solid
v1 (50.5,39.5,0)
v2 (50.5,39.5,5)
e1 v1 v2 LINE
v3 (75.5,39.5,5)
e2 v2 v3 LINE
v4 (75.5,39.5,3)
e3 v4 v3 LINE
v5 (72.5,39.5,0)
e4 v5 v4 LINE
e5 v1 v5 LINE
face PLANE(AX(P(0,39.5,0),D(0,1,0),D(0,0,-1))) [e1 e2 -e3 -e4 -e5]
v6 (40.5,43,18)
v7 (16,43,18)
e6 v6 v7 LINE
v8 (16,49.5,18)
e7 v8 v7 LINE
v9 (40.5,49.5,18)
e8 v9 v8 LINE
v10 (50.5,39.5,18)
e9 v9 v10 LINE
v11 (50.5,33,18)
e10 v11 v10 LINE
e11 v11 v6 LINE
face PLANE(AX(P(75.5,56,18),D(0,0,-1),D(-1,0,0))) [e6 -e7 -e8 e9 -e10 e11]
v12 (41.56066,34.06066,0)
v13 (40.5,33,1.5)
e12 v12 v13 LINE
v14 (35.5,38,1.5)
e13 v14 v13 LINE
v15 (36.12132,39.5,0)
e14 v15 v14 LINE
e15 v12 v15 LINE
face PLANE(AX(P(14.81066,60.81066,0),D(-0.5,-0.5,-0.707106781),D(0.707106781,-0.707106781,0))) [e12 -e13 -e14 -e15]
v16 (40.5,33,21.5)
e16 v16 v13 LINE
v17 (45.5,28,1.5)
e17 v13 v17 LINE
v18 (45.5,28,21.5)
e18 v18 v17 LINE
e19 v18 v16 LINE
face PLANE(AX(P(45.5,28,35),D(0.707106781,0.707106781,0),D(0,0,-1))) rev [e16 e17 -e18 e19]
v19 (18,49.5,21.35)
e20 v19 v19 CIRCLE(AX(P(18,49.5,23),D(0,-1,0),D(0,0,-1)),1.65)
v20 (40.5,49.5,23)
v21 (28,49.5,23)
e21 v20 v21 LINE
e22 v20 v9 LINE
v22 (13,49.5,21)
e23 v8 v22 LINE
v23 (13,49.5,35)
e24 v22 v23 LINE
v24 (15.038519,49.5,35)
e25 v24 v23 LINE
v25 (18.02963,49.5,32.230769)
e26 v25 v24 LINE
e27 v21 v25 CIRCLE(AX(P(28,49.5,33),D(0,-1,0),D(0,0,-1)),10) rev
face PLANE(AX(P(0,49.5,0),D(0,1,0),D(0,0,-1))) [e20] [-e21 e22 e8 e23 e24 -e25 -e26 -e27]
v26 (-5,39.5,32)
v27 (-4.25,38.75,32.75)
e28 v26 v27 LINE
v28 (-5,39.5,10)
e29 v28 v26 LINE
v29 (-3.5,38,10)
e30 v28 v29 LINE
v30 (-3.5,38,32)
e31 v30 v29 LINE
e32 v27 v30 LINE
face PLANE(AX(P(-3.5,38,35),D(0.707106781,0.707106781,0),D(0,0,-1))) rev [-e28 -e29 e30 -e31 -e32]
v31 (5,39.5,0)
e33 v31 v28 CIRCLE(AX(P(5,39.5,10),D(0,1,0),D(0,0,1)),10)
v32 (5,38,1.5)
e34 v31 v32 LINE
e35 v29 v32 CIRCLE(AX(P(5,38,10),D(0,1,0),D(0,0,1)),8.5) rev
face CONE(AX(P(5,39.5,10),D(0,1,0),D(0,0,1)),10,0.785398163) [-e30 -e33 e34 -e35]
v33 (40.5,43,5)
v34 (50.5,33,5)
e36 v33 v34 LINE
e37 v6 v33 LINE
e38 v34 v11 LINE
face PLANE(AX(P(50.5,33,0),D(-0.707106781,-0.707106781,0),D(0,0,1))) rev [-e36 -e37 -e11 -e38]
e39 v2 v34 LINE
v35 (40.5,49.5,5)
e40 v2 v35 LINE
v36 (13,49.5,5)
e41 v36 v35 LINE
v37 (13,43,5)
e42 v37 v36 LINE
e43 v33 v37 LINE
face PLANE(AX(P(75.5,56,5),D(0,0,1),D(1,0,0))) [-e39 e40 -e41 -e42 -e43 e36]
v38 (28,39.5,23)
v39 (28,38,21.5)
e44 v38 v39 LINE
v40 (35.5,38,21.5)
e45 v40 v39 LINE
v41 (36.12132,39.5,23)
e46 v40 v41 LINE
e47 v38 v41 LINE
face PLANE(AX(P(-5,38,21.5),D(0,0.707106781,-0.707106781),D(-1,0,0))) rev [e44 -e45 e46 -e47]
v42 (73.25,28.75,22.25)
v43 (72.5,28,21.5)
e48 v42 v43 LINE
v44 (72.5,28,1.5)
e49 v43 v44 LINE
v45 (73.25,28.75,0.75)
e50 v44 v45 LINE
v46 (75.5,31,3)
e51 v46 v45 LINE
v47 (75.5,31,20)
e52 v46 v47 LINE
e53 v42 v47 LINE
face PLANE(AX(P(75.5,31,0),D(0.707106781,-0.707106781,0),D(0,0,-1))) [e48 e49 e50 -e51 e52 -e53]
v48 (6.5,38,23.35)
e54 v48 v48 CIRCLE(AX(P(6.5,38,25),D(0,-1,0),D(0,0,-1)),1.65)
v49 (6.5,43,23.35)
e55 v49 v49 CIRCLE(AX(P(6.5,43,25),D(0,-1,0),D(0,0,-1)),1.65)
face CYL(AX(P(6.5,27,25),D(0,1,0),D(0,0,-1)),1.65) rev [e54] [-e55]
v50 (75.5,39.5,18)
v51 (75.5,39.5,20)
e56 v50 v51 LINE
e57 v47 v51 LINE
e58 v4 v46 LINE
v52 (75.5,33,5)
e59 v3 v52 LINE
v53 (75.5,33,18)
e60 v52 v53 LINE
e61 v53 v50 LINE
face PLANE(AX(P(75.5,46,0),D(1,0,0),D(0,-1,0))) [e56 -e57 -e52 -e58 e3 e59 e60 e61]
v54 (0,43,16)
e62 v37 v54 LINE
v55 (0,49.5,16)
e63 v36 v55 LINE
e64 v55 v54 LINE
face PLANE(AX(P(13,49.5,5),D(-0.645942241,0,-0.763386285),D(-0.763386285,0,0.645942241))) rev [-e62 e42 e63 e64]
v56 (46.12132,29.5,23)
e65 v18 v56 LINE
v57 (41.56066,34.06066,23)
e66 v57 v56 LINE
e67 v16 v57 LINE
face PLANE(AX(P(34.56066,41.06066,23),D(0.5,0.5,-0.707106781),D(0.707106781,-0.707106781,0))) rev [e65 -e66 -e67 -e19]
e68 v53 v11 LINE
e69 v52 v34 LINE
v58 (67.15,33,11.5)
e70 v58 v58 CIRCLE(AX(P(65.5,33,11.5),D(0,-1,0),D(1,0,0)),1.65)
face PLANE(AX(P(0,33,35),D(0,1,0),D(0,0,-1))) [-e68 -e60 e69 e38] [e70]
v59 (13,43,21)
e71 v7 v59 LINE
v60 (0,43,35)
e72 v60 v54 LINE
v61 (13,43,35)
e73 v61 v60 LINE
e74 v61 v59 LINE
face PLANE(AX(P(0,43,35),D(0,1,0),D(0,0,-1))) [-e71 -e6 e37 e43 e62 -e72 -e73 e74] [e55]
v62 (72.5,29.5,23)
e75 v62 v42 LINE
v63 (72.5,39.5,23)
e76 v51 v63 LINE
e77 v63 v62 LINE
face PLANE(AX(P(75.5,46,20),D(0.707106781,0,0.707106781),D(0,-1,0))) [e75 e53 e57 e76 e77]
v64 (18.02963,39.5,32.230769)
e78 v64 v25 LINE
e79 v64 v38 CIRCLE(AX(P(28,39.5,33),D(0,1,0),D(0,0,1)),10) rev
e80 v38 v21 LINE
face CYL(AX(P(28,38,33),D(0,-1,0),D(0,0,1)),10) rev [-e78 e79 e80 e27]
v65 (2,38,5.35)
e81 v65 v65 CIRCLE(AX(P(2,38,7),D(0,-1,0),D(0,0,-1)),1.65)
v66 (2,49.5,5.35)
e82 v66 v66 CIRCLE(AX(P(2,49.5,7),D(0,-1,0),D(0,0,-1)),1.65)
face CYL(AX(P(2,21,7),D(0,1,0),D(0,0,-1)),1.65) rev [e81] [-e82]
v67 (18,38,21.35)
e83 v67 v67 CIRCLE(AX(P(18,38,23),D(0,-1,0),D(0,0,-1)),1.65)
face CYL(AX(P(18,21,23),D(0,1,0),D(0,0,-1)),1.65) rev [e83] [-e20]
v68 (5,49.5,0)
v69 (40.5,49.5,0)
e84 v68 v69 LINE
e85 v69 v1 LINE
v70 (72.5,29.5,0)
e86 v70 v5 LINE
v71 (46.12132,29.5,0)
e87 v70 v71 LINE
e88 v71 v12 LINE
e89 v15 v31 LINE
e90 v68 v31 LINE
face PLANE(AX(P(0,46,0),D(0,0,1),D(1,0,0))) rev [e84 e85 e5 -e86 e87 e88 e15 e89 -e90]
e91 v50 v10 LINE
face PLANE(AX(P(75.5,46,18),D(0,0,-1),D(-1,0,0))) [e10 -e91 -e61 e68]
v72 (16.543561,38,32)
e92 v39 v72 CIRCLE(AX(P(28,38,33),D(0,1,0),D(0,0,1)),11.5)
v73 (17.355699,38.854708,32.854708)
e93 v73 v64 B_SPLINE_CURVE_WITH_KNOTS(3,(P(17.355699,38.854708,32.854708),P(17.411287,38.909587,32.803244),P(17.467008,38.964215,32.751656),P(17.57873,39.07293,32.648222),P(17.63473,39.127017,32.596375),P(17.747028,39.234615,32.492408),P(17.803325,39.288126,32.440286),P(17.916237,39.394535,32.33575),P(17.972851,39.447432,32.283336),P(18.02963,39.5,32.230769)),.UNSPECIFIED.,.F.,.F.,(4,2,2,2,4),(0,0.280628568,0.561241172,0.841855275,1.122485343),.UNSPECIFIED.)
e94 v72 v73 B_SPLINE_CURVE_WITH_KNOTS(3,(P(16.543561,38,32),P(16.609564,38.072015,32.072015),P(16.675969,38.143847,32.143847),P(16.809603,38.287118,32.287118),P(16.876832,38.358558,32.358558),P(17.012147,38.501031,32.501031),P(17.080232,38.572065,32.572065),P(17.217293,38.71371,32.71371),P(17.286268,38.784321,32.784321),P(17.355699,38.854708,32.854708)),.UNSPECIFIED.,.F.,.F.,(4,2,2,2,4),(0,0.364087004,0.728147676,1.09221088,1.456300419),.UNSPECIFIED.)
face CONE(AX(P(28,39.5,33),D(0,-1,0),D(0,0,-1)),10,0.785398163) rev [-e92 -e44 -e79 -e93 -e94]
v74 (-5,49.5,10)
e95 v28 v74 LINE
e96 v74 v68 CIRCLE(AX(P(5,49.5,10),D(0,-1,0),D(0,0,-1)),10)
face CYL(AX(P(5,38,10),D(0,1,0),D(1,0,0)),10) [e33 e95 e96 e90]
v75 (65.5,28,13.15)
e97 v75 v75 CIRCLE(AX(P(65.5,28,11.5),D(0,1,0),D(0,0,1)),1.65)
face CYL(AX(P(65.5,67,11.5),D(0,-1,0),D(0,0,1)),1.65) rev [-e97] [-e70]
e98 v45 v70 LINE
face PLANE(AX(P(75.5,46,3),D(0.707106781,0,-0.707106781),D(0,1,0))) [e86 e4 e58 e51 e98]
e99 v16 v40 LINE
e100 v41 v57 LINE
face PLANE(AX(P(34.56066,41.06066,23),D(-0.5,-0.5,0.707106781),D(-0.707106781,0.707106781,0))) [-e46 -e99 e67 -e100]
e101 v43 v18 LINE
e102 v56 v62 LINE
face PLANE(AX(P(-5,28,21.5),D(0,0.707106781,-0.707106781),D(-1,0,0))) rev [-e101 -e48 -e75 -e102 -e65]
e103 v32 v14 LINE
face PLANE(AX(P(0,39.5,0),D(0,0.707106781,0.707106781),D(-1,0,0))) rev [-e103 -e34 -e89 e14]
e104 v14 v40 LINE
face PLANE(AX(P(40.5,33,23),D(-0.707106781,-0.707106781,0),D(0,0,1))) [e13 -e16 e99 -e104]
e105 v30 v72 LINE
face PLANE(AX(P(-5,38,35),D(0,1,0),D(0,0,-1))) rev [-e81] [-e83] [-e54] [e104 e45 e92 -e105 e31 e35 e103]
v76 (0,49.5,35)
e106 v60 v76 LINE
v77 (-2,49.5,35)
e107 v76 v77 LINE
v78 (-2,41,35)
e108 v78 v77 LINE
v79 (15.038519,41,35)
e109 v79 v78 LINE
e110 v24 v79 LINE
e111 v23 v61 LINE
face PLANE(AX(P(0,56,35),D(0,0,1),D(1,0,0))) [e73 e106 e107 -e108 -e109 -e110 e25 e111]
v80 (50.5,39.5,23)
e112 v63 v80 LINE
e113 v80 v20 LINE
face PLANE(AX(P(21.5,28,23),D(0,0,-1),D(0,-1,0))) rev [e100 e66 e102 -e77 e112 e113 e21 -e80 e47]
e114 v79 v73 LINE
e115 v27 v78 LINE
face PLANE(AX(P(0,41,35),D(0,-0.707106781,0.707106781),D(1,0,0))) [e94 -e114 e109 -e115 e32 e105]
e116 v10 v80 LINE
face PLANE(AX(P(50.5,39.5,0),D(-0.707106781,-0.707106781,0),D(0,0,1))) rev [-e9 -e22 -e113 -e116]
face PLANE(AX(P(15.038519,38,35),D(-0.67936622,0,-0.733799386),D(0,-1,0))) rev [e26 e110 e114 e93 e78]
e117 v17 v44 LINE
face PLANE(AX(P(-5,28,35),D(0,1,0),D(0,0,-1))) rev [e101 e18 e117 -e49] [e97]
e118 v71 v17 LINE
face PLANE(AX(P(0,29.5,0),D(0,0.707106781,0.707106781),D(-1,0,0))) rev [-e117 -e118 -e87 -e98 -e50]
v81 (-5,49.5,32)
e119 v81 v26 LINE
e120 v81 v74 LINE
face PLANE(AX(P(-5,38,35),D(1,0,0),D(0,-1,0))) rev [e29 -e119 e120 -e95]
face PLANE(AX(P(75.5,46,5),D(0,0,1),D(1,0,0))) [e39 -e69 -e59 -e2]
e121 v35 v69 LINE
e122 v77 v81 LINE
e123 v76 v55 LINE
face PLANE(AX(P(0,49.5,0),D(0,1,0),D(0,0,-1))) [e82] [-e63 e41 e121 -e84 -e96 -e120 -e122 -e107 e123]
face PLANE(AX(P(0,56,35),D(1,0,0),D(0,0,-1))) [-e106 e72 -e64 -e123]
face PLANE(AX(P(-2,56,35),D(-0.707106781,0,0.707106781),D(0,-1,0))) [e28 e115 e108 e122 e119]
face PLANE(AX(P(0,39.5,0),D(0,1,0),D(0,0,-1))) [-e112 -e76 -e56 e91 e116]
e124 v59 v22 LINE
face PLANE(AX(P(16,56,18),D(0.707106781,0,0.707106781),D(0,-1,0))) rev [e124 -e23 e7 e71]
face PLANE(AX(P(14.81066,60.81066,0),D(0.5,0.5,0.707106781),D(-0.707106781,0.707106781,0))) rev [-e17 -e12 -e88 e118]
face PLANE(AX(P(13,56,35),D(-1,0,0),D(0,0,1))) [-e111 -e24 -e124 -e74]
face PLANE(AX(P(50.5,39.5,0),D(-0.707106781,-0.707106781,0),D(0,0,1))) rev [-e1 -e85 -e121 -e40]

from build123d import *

# Parameters (mm, degrees)
SKETCH_1_W               = 23
SKETCH_1_H               = 23
SKETCH_1_W_2             = 13
SKETCH_1_H_2             = 13
EXTRUDE_1_DEPTH          = 35
SKETCH_2_R               = 1.65
CUT_EXTRUDE_1_DEPTH      = 34
SKETCH_4_W               = 23
SKETCH_4_H               = 23
SKETCH_4_R               = 3
EXTRUDE_2_DEPTH          = 3.5
SKETCH_5_W               = 23
SKETCH_5_H               = 23
SKETCH_5_W_2             = 13
SKETCH_5_H_2             = 13
EXTRUDE_1_2_DEPTH        = 54
SKETCH_6_R               = 1.65
CUT_EXTRUDE_2_DEPTH      = 39
SKETCH_7_W               = 13
SKETCH_7_H               = 13
CUT_EXTRUDE_3_DEPTH      = 13
CHAMFER_1_SIZE           = 3
SKETCH_8_W               = 80.5
SKETCH_8_H               = 35
CUT_EXTRUDE_4_DEPTH      = 11.5
EXTRUDE_3_DEPTH          = 6.5
FILLET_1_R               = 10
FILLET_2_R               = 10
SKETCH_10_R              = 1.65
CUT_EXTRUDE_5_DEPTH      = 28.5
CHAMFER_4_SIZE           = 3
CHAMFER_START            = 6.5
CHAMFER_5_DEPTH          = 11.5
CUT_EXTRUDE_6_DEPTH      = 106
CUT_EXTRUDE_6_DEPTH_BACK = 86
SKETCH_12_W              = 100.531840745
SKETCH_12_H              = 30.474622789
SKETCH_13_W              = 10
SKETCH_13_H              = 23
EXTRUDE_5_DEPTH          = 10
CHAMFER_13_SIZE          = 10
CHAMFER_14_SIZE          = 10
CHAMFER_15_SIZE          = 5
CHAMFER_16_SIZE          = 5
CHAMFER_17_SIZE          = 1.5


with BuildPart() as part:
    # 草图1 → Extrude 1 (new body)
    with BuildSketch(Plane.XY):
        with Locations((6.5, 6.5)):
            Rectangle(SKETCH_1_W, SKETCH_1_H)
        with Locations((6.5, 6.5)):
            Rectangle(SKETCH_1_W_2, SKETCH_1_H_2, mode=Mode.SUBTRACT)
    extrude(amount=EXTRUDE_1_DEPTH)

    # 草图2 → 切除-拉伸1 (cut)
    with BuildSketch(Plane.XZ.offset(5)):
        with Locations(Location((6.5, 25, 0), (0, 0, 270))):
            Circle(SKETCH_2_R)
    extrude(amount=-CUT_EXTRUDE_1_DEPTH, mode=Mode.SUBTRACT)

    # 草图4 → 凸台-拉伸2 (add)
    with BuildSketch(Plane(origin=(18, 0, 0), x_dir=(0, 0, -1), z_dir=(1, 0, 0))):
        with Locations((-11.5, 6.5)):
            Rectangle(SKETCH_4_W, SKETCH_4_H)
        with Locations(Location((-11.5, 6.5, 0), (0, 0, 90))):
            Circle(SKETCH_4_R, mode=Mode.SUBTRACT)
    extrude(amount=EXTRUDE_2_DEPTH)

    # 草图5 → Extrude 1 2 (add)
    with BuildSketch(Plane(origin=(21.5, 0, 0), x_dir=(0, 0, -1), z_dir=(1, 0, 0))):
        with Locations((-11.5, 6.5)):
            Rectangle(SKETCH_5_W, SKETCH_5_H)
        with Locations((-11.5, 6.5)):
            Rectangle(SKETCH_5_W_2, SKETCH_5_H_2, mode=Mode.SUBTRACT)
    extrude(amount=EXTRUDE_1_2_DEPTH)

    # 草图6 → 切除-拉伸2 (cut)
    with BuildSketch(Plane(origin=(0, 18, 0), x_dir=(1, 0, 0), z_dir=(0, 1, 0))):
        with Locations(Location((65.5, -11.5, 0), (0, 0, 270))):
            Circle(SKETCH_6_R)
    extrude(amount=-CUT_EXTRUDE_2_DEPTH, mode=Mode.SUBTRACT)

    # 草图7 → 切除-拉伸3 (cut)
    with BuildSketch(Plane(origin=(21.5, 0, 0), x_dir=(0, 0, -1), z_dir=(1, 0, 0))):
        with Locations((-11.5, 6.5)):
            Rectangle(SKETCH_7_W, SKETCH_7_H)
    extrude(amount=-CUT_EXTRUDE_3_DEPTH, mode=Mode.SUBTRACT)

    # 倒角1
    chamfer_1_edges = [part.edges().sort_by_distance(p)[0] for p in [
        (13, 6.5, 18),
    ]]
    chamfer(chamfer_1_edges, length=CHAMFER_1_SIZE)

    # 草图8 → 切除-拉伸4 (cut)
    with BuildSketch(Plane.XZ.offset(5)):
        with Locations((35.25, 17.5)):
            Rectangle(SKETCH_8_W, SKETCH_8_H)
    extrude(amount=-CUT_EXTRUDE_4_DEPTH, mode=Mode.SUBTRACT)

    # 草图9 → 凸台-拉伸3 (add)
    with BuildSketch(Plane.XZ.offset(-13)):
        Polygon((13, 5), (0, 16), (0, 0), (13, 0), align=None)
    extrude(amount=EXTRUDE_3_DEPTH)

    # 圆角1
    fillet_1_edges = [part.edges().sort_by_distance(p)[0] for p in [
        (-5, 12.25, 0),
    ]]
    fillet(fillet_1_edges, radius=FILLET_1_R)

    # 圆角2
    fillet_2_edges = [part.edges().sort_by_distance(p)[0] for p in [
        (18, 12.25, 23),
    ]]
    fillet(fillet_2_edges, radius=FILLET_2_R)

    # 草图10 → 切除-拉伸5 (cut)
    with BuildSketch(Plane.XZ.offset(-6.5)):
        with Locations(Location((2, 7, 0), (0, 0, 270))):
            Circle(SKETCH_10_R)
        with Locations(Location((18, 23, 0), (0, 0, 270))):
            Circle(SKETCH_10_R)
    extrude(amount=-CUT_EXTRUDE_5_DEPTH, mode=Mode.SUBTRACT)

    # 倒角4
    chamfer_4_edges = [part.edges().sort_by_distance(p)[0] for p in [
        (75.5, 18, 11.5),
        (6.5, 18, 35),
    ]]
    chamfer(chamfer_4_edges, length=CHAMFER_4_SIZE)

    # 倒角5: read off the stored shape, not the designer's step
    # 倒角5 outline → 倒角5 (cut)
    with BuildSketch(Plane(origin=(0, 0, 0), x_dir=(1, 0, 0), z_dir=(0, 1, 0)).offset(CHAMFER_START)):
        Polygon((72.5, 0), (75.5, -3), (75.5, 0), align=None)
        Polygon((-5, -35), (-2, -35), (-5, -32), align=None)
        with BuildLine():
            ThreePointArc((18, -33), (18.007410169, -32.615099398), (18.029629695, -32.230769231))
            Line((18.029629695, -32.230769231), (15.038518603, -35))
            Line((15.038518603, -35), (18, -35))
            Line((18, -35), (18, -33))
        make_face()
        Polygon((75.5, -20), (72.5, -23), (75.5, -23), align=None)
    extrude(amount=CHAMFER_5_DEPTH, mode=Mode.SUBTRACT)


with BuildPart() as body_2:
    # Split Bodies 1: the piece on the far side of the plane
    add(part.part)
    split(bisect_by=Plane.YZ.offset(50.5), keep=Keep.BOTTOM)


with BuildPart() as part_1:
    add(part.part)

    # Split Bodies 1
    split(bisect_by=Plane.YZ.offset(50.5), keep=Keep.TOP)


with BuildPart() as part_2:
    # Move Body 1: read off the stored shape, not the designer's step
    # Move Body 1: moved
    add(part_1.part.moved(Location((0, 10, 0))))

    # Combine 1: union body 2
    add(body_2.part)


with BuildPart() as body_2_2:
    # 镜向1: mirrored copy
    add(part_2.part.mirror(Plane(origin=(-5, 28, 35), x_dir=(0, 0, 1), z_dir=(0, -1, 0))))

    # 草图13 → 凸台-拉伸5 (add)
    with BuildSketch(Plane.XZ.offset(-38)):
        with Locations((45.5, 11.5)):
            Rectangle(SKETCH_13_W, SKETCH_13_H)
    extrude(amount=EXTRUDE_5_DEPTH)

    # 倒角13
    # the kernel refuses this chamfer: 10 mm, written as the material it takes off along each edge
    with BuildSketch(Plane(origin=(50.5, 43, 5), x_dir=(0, -1, 0), z_dir=(0, 0, 1))) as chamfer_13_piece_1:
        Polygon((CHAMFER_13_SIZE, 0), (0, -CHAMFER_13_SIZE), (0, 0), align=None)
    extrude(amount=13, mode=Mode.SUBTRACT)

    # 倒角14
    chamfer_14_edges = [body_2_2.edges().sort_by_distance(p)[0] for p in [
        (50.5, 49.5, 2.5),
        (50.5, 49.5, 20.5),
    ]]
    chamfer(chamfer_14_edges, length=CHAMFER_14_SIZE - 0.0001)  # a hair under: the kernel refuses the full size

    # 倒角15
    chamfer_15_edges = [body_2_2.edges().sort_by_distance(p)[0] for p in [
        (40.5, 38, 11.5),
    ]]
    chamfer(chamfer_15_edges, length=CHAMFER_15_SIZE)

    # 倒角16
    chamfer_16_edges = [body_2_2.edges().sort_by_distance(p)[0] for p in [
        (40.5, 28, 11.5),
    ]]
    chamfer(chamfer_16_edges, length=CHAMFER_16_SIZE - 0.0001)  # a hair under: the kernel refuses the full size

    # 倒角17
    chamfer_17_edges = [body_2_2.edges().sort_by_distance(p)[0] for p in [
        (40.5, 32.99995, 23),
        (42.99995, 30.49995, 23),
        (38, 35.5, 23),
        (58.99995, 28, 23),
        (31.75, 38, 23),
        (40.5, 32.99995, 0),
        (42.99995, 30.49995, 0),
        (38, 35.5, 0),
        (58.99995, 28, 0),
        (20.25, 38, 0),
        (-2.071067812, 38, 2.928932188),
        (-5, 38, 21),
        (21.291796068, 38, 25.583801513),
    ]]
    chamfer(chamfer_17_edges, length=CHAMFER_17_SIZE)


with BuildPart() as part_3:
    add(part_2.part)

    # 草图12 → 切除-拉伸6 (cut, two sides: drawn at the far end of the back side and taken through both)
    with BuildSketch(Plane.XY.offset(23).offset(-CUT_EXTRUDE_6_DEPTH_BACK)):
        with Locations((32.005641973, 12.762688605)):
            Rectangle(SKETCH_12_W, SKETCH_12_H)
    extrude(amount=CUT_EXTRUDE_6_DEPTH + CUT_EXTRUDE_6_DEPTH_BACK, mode=Mode.SUBTRACT)


solid = body_2_2.part
